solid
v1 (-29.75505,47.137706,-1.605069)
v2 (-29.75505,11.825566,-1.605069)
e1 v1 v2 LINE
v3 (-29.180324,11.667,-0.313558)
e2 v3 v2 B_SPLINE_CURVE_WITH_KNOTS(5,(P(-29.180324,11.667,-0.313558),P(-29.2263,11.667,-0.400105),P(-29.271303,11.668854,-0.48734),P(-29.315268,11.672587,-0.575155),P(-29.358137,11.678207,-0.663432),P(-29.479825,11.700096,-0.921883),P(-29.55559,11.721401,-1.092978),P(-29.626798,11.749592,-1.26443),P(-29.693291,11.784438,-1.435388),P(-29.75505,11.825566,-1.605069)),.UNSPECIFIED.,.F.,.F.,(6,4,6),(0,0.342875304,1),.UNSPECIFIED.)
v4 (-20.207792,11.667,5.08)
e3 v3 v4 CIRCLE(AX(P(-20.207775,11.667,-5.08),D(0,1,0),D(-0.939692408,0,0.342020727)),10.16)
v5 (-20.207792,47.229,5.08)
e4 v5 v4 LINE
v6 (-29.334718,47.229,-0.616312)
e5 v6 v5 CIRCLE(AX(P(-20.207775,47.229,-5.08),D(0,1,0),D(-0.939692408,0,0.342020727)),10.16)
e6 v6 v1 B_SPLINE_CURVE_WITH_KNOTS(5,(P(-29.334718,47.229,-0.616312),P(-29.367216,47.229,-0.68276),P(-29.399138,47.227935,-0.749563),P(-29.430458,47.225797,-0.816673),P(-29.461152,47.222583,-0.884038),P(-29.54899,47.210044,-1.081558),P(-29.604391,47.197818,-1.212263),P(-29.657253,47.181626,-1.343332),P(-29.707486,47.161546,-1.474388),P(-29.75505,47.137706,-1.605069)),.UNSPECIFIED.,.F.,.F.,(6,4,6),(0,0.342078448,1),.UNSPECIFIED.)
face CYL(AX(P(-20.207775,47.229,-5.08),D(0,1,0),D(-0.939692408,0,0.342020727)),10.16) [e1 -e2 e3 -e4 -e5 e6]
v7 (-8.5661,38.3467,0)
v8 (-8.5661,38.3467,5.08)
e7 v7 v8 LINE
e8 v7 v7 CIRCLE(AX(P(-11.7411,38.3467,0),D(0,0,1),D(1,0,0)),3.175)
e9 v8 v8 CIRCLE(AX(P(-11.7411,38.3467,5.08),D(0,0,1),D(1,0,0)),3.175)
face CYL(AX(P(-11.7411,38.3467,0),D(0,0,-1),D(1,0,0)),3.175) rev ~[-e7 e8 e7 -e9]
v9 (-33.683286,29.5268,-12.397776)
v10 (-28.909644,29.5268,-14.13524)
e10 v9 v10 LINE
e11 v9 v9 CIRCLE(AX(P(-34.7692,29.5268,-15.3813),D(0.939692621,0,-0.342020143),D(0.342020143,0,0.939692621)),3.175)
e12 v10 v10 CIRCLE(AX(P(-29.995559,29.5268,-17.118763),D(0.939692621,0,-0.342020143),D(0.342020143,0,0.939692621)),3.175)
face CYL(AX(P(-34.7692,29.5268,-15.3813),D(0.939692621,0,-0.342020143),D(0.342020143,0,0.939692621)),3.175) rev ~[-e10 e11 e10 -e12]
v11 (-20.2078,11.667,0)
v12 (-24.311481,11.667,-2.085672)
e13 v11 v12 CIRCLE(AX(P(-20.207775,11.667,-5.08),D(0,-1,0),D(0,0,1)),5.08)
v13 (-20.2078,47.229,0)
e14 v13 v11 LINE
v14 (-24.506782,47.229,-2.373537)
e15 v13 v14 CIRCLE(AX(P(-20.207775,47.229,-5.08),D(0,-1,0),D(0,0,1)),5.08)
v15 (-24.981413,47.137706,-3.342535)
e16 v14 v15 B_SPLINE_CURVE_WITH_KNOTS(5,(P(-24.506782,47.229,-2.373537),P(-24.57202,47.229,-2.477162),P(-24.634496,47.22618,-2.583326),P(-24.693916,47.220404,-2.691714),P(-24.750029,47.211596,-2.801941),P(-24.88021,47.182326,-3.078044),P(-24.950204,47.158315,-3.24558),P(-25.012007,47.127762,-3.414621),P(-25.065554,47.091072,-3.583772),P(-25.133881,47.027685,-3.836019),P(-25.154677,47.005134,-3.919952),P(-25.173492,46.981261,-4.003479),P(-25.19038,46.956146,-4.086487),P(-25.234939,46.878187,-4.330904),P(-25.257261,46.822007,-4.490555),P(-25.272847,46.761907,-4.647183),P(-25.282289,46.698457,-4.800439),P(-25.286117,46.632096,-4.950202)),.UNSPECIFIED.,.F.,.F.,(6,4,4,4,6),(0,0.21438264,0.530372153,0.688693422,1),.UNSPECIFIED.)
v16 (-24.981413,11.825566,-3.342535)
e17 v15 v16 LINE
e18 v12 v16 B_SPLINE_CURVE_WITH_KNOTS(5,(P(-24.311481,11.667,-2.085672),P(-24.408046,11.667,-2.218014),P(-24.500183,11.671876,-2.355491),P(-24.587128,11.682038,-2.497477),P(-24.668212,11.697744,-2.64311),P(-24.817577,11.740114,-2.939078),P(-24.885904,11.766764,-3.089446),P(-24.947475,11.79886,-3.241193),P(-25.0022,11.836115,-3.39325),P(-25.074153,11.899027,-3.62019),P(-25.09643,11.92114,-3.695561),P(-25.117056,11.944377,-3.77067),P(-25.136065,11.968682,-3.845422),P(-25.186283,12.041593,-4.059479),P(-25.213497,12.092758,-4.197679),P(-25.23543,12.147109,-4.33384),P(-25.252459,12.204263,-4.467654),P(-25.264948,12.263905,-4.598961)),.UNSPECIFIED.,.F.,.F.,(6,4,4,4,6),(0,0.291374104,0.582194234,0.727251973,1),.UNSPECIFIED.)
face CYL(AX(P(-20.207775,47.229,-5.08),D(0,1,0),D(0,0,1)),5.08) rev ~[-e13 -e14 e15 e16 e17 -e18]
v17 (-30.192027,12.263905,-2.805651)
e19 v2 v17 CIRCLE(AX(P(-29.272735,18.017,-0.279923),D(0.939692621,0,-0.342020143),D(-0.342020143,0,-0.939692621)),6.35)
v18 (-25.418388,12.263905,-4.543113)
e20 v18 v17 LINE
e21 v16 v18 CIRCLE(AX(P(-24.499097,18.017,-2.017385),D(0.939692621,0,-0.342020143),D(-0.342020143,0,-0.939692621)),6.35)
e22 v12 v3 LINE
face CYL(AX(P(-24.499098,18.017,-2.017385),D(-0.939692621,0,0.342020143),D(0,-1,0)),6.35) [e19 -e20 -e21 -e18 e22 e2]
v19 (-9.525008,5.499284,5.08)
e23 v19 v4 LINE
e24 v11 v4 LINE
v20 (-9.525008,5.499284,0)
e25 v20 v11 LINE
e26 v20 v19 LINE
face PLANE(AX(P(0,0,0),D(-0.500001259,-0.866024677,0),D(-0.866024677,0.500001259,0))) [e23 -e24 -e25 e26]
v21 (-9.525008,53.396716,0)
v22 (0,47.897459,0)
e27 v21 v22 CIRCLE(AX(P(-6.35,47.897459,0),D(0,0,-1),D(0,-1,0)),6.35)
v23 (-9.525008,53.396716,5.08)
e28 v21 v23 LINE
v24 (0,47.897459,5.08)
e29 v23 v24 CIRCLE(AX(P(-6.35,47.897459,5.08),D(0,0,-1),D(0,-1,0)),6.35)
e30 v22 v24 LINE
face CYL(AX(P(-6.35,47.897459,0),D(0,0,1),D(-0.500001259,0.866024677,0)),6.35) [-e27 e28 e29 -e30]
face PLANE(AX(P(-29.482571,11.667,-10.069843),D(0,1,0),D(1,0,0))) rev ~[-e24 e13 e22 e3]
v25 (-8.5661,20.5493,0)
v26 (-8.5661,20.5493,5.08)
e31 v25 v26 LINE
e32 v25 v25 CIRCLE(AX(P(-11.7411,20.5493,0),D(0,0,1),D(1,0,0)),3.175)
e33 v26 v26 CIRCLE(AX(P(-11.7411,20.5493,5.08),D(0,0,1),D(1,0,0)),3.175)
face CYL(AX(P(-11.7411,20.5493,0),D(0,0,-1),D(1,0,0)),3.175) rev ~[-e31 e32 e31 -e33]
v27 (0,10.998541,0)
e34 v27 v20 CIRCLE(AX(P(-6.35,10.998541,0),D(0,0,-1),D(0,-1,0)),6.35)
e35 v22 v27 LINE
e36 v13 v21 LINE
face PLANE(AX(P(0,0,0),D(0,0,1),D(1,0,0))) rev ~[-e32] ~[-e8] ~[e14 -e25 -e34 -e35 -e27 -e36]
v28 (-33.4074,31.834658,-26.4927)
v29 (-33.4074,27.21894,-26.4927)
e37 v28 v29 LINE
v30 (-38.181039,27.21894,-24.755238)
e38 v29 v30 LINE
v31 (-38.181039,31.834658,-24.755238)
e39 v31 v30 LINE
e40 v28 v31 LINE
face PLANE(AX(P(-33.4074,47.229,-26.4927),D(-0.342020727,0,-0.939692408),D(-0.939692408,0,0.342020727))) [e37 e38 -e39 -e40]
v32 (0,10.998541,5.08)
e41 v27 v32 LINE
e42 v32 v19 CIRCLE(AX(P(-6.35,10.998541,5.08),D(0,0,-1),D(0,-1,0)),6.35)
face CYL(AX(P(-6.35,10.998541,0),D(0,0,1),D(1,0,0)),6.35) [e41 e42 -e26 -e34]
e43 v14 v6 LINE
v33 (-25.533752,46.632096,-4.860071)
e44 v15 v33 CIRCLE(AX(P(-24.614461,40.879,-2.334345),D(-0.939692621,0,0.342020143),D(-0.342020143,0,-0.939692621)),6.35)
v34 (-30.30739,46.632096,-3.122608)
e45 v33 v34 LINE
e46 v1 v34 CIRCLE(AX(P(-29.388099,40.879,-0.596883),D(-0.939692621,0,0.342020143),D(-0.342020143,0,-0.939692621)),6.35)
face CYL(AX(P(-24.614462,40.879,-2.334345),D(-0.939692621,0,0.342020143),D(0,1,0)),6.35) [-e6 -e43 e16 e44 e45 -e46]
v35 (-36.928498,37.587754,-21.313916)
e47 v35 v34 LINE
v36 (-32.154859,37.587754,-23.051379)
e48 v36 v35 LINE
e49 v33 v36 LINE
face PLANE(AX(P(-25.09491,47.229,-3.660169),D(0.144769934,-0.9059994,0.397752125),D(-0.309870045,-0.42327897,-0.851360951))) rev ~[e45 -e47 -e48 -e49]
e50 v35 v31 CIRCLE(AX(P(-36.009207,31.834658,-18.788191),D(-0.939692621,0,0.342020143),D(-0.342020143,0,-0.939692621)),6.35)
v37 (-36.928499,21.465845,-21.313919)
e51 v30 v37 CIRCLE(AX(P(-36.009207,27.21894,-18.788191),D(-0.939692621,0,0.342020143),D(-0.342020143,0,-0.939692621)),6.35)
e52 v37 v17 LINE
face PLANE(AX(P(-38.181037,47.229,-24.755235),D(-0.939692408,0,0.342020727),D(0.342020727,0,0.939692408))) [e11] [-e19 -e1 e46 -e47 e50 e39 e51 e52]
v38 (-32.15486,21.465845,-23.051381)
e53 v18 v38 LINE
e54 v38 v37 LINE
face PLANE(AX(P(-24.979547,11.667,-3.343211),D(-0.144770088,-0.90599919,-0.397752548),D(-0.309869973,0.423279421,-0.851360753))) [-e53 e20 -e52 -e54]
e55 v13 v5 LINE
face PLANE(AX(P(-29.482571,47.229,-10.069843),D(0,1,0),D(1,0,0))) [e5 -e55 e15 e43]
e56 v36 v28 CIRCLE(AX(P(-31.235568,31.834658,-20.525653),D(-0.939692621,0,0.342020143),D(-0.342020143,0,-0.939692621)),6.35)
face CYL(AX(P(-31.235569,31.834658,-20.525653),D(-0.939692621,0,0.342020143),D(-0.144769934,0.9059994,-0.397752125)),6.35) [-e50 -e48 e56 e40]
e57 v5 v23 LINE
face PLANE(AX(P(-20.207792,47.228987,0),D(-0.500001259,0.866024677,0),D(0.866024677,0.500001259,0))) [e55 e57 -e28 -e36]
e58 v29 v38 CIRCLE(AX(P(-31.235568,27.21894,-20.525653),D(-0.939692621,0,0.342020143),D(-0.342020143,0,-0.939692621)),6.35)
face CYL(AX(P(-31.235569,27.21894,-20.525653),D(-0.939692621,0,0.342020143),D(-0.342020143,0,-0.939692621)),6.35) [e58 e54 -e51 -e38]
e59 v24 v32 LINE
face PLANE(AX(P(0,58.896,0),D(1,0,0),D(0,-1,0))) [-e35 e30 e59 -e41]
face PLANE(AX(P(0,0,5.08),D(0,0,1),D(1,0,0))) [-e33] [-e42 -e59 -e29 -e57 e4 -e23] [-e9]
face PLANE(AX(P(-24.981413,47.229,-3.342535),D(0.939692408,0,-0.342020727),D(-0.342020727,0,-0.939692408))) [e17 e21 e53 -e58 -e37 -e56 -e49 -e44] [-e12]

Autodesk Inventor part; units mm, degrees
ref_plane "YZ Plane" through (0, 0, 0) normal (1, 0, 0) x (0, 1, 0)
ref_plane "XZ Plane" through (0, 0, 0) normal (0, 1, 0) x (-1, 0, 0)
ref_plane "XY Plane" through (0, 0, 0) normal (0, 0, 1) x (1, 0, 0)
sketch "Base" plane through (0, 0, 0) normal (0, 0, 1) x (1, 0, 0)
  line L0 (-23.4822, 45.3385) -> (0, 58.896)
  line L1 (-23.4822, 13.5575) -> (-23.4822, 45.3385)
  line L2 (0, 0) -> (-23.4822, 13.5575)
  line L3 (0, 58.896) -> (0, 0)
  circle A0 centre (-11.7411, 38.3467) radius 3.175
  circle A1 centre (-11.7411, 20.5493) radius 3.175
  line L4 (-11.7411, 38.3467) -> (-11.7411, 20.5493) construction
  line L5 (-11.7411, 29.448) -> (-23.4822, 29.448) construction
  line L6 (-20.2078, 47.229) -> (-20.2078, 11.667)
  dimension "d0" = 58.896
  dimension "d1" = 27.1149
  dimension "d2" = 60
  dimension "d3" = 60
  dimension "d4" = 31.7811
  dimension "d5" = 6.35
  dimension "d6" = 17.7974
  dimension "d7" = 11.7411
  dimension "d8" = 11.7411
  dimension "d9" = 8.4667
extrude "Plate1" add sketch "Base" along normal blind 5.08 contours L0 L3 L2 L6
sketch "Sketch2" plane through (-24.9814, 47.229, -3.3425) normal (-0.9396926, 0, 0.3420201) x (0, -1, 0)
  line L0 (35.562, 0) -> (0, 0)
  line L1 (0, 0) -> (0, -24.6359)
  line L2 (0, -24.6359) -> (35.562, -24.6359)
  line L3 (35.562, -24.6359) -> (35.562, 0)
edge flange "ShockFlangeFeature" height 31.75 angle 70 thickness 5.08 bend radius 5.08 thickness toward (-0.9396926, 0, 0.3420201) relief tear relief width 5.08 relief depth 2.54 edges at (-20.2078, 29.448, 0) wall of the first edge with corners at (-24.9814, 11.667, -3.3425) (-24.9814, 47.229, -3.3425) (-33.4074, 47.229, -26.4927) (-33.4074, 11.667, -26.4927)
bend "Bend1"
corner "Corner1"
sketch "ShockFlangeDraft" plane through (-33.4074, 11.667, -26.4927) normal (0.9396926, 0, -0.3420201) x (-0.3420201, 0, -0.9396926)
  line L0 (-24.6359, 35.562) -> (-24.6359, 0) projected
  line L1 (0, 0) -> (-24.6359, 0) projected
  line L2 (0, 0) -> (0, 35.562) projected
  line L3 (0, 35.562) -> (-24.6359, 35.562) projected
  line L4 (-24.2986, 35.562) -> (0, 24.2098)
  line L5 (-24.6359, 0) -> (0, 11.5098)
  line L6 (0, 17.781) -> (-24.6359, 17.781) construction
  line L7 (-24.6359, 35.562) -> (-24.6359, 0) projected
  point P0 (-36.321, -11.667)
  dimension "d34" = 64.958
  dimension "d35" = 64.958
  dimension "d36" = 12.7
extrude "ShockFlangeDraftFeature" cut sketch "ShockFlangeDraft" against normal blind 25.4 contours L5 L2 L1 | L3 L2 L4
fillet "FilletsFeature" radius 6.35 6 edges at (-35.7942, 35.8768, -25.624) (0, 58.896, 2.54) (0, 0, 2.54) (-27.4836, 47.229, -2.7907) (-35.7942, 23.1768, -25.624) (-27.3682, 11.667, -2.4738)
sketch "ShockMountHole" plane through (-29.755, 11.667, -1.6051) normal (-0.9396926, 0, 0.3420201) x (0.3420201, 0, 0.9396926)
  circle A0 centre (-14.6604, 17.8598) radius 9.9755 construction
  line L0 (-24.6359, 15.5519) -> (-24.6359, 20.1677) projected
  line L1 (-20.9737, 25.9208) -> (-1.6149, 34.9651) projected
  line L2 (-1.2776, 0.5969) -> (-20.9737, 9.7989) projected
  circle A1 centre (-14.6604, 17.8598) radius 3.175
  point P0 (-0.1927, 28.9261)
  dimension "d37" = 6.35
hole "ShockMountHoleFeature" at (-34.7692, 29.5268, -15.3813) direction (0.9396926, 0, -0.3420201) diameter 6.35 end through all
equation "\"d35\" = d34"
equation "\"d32\" = Thickness"
equation "\"d10\" = Thickness"
equation "\"d11\" = BendReliefWidth"
equation "\"d12\" = BendReliefDepth"
equation "\"d13\" = MinimumRemnant"
equation "\"d14\" = TransitionRadius"
equation "\"d17\" = BendRadius"
equation "\"d18\" = CornerReliefSize"
equation "\"d19\" = GapSize"
equation "\"d20\" = JacobiRadiusSize"
equation "\"BendRadius\" = Thickness"
equation "\"BendReliefWidth\" = Thickness"
equation "\"BendReliefDepth\" = 0.5 * Thickness"
equation "\"CornerReliefSize\" = 4 * Thickness"
equation "\"MinimumRemnant\" = 2 * Thickness"
equation "\"TransitionRadius\" = BendRadius"
equation "\"JacobiRadiusSize\" = BendRadius"
equation "\"GapSize\" = Thickness"
equation "\"Thickness\" = 5.08"
properties part number "ChestPelvisConnector"
